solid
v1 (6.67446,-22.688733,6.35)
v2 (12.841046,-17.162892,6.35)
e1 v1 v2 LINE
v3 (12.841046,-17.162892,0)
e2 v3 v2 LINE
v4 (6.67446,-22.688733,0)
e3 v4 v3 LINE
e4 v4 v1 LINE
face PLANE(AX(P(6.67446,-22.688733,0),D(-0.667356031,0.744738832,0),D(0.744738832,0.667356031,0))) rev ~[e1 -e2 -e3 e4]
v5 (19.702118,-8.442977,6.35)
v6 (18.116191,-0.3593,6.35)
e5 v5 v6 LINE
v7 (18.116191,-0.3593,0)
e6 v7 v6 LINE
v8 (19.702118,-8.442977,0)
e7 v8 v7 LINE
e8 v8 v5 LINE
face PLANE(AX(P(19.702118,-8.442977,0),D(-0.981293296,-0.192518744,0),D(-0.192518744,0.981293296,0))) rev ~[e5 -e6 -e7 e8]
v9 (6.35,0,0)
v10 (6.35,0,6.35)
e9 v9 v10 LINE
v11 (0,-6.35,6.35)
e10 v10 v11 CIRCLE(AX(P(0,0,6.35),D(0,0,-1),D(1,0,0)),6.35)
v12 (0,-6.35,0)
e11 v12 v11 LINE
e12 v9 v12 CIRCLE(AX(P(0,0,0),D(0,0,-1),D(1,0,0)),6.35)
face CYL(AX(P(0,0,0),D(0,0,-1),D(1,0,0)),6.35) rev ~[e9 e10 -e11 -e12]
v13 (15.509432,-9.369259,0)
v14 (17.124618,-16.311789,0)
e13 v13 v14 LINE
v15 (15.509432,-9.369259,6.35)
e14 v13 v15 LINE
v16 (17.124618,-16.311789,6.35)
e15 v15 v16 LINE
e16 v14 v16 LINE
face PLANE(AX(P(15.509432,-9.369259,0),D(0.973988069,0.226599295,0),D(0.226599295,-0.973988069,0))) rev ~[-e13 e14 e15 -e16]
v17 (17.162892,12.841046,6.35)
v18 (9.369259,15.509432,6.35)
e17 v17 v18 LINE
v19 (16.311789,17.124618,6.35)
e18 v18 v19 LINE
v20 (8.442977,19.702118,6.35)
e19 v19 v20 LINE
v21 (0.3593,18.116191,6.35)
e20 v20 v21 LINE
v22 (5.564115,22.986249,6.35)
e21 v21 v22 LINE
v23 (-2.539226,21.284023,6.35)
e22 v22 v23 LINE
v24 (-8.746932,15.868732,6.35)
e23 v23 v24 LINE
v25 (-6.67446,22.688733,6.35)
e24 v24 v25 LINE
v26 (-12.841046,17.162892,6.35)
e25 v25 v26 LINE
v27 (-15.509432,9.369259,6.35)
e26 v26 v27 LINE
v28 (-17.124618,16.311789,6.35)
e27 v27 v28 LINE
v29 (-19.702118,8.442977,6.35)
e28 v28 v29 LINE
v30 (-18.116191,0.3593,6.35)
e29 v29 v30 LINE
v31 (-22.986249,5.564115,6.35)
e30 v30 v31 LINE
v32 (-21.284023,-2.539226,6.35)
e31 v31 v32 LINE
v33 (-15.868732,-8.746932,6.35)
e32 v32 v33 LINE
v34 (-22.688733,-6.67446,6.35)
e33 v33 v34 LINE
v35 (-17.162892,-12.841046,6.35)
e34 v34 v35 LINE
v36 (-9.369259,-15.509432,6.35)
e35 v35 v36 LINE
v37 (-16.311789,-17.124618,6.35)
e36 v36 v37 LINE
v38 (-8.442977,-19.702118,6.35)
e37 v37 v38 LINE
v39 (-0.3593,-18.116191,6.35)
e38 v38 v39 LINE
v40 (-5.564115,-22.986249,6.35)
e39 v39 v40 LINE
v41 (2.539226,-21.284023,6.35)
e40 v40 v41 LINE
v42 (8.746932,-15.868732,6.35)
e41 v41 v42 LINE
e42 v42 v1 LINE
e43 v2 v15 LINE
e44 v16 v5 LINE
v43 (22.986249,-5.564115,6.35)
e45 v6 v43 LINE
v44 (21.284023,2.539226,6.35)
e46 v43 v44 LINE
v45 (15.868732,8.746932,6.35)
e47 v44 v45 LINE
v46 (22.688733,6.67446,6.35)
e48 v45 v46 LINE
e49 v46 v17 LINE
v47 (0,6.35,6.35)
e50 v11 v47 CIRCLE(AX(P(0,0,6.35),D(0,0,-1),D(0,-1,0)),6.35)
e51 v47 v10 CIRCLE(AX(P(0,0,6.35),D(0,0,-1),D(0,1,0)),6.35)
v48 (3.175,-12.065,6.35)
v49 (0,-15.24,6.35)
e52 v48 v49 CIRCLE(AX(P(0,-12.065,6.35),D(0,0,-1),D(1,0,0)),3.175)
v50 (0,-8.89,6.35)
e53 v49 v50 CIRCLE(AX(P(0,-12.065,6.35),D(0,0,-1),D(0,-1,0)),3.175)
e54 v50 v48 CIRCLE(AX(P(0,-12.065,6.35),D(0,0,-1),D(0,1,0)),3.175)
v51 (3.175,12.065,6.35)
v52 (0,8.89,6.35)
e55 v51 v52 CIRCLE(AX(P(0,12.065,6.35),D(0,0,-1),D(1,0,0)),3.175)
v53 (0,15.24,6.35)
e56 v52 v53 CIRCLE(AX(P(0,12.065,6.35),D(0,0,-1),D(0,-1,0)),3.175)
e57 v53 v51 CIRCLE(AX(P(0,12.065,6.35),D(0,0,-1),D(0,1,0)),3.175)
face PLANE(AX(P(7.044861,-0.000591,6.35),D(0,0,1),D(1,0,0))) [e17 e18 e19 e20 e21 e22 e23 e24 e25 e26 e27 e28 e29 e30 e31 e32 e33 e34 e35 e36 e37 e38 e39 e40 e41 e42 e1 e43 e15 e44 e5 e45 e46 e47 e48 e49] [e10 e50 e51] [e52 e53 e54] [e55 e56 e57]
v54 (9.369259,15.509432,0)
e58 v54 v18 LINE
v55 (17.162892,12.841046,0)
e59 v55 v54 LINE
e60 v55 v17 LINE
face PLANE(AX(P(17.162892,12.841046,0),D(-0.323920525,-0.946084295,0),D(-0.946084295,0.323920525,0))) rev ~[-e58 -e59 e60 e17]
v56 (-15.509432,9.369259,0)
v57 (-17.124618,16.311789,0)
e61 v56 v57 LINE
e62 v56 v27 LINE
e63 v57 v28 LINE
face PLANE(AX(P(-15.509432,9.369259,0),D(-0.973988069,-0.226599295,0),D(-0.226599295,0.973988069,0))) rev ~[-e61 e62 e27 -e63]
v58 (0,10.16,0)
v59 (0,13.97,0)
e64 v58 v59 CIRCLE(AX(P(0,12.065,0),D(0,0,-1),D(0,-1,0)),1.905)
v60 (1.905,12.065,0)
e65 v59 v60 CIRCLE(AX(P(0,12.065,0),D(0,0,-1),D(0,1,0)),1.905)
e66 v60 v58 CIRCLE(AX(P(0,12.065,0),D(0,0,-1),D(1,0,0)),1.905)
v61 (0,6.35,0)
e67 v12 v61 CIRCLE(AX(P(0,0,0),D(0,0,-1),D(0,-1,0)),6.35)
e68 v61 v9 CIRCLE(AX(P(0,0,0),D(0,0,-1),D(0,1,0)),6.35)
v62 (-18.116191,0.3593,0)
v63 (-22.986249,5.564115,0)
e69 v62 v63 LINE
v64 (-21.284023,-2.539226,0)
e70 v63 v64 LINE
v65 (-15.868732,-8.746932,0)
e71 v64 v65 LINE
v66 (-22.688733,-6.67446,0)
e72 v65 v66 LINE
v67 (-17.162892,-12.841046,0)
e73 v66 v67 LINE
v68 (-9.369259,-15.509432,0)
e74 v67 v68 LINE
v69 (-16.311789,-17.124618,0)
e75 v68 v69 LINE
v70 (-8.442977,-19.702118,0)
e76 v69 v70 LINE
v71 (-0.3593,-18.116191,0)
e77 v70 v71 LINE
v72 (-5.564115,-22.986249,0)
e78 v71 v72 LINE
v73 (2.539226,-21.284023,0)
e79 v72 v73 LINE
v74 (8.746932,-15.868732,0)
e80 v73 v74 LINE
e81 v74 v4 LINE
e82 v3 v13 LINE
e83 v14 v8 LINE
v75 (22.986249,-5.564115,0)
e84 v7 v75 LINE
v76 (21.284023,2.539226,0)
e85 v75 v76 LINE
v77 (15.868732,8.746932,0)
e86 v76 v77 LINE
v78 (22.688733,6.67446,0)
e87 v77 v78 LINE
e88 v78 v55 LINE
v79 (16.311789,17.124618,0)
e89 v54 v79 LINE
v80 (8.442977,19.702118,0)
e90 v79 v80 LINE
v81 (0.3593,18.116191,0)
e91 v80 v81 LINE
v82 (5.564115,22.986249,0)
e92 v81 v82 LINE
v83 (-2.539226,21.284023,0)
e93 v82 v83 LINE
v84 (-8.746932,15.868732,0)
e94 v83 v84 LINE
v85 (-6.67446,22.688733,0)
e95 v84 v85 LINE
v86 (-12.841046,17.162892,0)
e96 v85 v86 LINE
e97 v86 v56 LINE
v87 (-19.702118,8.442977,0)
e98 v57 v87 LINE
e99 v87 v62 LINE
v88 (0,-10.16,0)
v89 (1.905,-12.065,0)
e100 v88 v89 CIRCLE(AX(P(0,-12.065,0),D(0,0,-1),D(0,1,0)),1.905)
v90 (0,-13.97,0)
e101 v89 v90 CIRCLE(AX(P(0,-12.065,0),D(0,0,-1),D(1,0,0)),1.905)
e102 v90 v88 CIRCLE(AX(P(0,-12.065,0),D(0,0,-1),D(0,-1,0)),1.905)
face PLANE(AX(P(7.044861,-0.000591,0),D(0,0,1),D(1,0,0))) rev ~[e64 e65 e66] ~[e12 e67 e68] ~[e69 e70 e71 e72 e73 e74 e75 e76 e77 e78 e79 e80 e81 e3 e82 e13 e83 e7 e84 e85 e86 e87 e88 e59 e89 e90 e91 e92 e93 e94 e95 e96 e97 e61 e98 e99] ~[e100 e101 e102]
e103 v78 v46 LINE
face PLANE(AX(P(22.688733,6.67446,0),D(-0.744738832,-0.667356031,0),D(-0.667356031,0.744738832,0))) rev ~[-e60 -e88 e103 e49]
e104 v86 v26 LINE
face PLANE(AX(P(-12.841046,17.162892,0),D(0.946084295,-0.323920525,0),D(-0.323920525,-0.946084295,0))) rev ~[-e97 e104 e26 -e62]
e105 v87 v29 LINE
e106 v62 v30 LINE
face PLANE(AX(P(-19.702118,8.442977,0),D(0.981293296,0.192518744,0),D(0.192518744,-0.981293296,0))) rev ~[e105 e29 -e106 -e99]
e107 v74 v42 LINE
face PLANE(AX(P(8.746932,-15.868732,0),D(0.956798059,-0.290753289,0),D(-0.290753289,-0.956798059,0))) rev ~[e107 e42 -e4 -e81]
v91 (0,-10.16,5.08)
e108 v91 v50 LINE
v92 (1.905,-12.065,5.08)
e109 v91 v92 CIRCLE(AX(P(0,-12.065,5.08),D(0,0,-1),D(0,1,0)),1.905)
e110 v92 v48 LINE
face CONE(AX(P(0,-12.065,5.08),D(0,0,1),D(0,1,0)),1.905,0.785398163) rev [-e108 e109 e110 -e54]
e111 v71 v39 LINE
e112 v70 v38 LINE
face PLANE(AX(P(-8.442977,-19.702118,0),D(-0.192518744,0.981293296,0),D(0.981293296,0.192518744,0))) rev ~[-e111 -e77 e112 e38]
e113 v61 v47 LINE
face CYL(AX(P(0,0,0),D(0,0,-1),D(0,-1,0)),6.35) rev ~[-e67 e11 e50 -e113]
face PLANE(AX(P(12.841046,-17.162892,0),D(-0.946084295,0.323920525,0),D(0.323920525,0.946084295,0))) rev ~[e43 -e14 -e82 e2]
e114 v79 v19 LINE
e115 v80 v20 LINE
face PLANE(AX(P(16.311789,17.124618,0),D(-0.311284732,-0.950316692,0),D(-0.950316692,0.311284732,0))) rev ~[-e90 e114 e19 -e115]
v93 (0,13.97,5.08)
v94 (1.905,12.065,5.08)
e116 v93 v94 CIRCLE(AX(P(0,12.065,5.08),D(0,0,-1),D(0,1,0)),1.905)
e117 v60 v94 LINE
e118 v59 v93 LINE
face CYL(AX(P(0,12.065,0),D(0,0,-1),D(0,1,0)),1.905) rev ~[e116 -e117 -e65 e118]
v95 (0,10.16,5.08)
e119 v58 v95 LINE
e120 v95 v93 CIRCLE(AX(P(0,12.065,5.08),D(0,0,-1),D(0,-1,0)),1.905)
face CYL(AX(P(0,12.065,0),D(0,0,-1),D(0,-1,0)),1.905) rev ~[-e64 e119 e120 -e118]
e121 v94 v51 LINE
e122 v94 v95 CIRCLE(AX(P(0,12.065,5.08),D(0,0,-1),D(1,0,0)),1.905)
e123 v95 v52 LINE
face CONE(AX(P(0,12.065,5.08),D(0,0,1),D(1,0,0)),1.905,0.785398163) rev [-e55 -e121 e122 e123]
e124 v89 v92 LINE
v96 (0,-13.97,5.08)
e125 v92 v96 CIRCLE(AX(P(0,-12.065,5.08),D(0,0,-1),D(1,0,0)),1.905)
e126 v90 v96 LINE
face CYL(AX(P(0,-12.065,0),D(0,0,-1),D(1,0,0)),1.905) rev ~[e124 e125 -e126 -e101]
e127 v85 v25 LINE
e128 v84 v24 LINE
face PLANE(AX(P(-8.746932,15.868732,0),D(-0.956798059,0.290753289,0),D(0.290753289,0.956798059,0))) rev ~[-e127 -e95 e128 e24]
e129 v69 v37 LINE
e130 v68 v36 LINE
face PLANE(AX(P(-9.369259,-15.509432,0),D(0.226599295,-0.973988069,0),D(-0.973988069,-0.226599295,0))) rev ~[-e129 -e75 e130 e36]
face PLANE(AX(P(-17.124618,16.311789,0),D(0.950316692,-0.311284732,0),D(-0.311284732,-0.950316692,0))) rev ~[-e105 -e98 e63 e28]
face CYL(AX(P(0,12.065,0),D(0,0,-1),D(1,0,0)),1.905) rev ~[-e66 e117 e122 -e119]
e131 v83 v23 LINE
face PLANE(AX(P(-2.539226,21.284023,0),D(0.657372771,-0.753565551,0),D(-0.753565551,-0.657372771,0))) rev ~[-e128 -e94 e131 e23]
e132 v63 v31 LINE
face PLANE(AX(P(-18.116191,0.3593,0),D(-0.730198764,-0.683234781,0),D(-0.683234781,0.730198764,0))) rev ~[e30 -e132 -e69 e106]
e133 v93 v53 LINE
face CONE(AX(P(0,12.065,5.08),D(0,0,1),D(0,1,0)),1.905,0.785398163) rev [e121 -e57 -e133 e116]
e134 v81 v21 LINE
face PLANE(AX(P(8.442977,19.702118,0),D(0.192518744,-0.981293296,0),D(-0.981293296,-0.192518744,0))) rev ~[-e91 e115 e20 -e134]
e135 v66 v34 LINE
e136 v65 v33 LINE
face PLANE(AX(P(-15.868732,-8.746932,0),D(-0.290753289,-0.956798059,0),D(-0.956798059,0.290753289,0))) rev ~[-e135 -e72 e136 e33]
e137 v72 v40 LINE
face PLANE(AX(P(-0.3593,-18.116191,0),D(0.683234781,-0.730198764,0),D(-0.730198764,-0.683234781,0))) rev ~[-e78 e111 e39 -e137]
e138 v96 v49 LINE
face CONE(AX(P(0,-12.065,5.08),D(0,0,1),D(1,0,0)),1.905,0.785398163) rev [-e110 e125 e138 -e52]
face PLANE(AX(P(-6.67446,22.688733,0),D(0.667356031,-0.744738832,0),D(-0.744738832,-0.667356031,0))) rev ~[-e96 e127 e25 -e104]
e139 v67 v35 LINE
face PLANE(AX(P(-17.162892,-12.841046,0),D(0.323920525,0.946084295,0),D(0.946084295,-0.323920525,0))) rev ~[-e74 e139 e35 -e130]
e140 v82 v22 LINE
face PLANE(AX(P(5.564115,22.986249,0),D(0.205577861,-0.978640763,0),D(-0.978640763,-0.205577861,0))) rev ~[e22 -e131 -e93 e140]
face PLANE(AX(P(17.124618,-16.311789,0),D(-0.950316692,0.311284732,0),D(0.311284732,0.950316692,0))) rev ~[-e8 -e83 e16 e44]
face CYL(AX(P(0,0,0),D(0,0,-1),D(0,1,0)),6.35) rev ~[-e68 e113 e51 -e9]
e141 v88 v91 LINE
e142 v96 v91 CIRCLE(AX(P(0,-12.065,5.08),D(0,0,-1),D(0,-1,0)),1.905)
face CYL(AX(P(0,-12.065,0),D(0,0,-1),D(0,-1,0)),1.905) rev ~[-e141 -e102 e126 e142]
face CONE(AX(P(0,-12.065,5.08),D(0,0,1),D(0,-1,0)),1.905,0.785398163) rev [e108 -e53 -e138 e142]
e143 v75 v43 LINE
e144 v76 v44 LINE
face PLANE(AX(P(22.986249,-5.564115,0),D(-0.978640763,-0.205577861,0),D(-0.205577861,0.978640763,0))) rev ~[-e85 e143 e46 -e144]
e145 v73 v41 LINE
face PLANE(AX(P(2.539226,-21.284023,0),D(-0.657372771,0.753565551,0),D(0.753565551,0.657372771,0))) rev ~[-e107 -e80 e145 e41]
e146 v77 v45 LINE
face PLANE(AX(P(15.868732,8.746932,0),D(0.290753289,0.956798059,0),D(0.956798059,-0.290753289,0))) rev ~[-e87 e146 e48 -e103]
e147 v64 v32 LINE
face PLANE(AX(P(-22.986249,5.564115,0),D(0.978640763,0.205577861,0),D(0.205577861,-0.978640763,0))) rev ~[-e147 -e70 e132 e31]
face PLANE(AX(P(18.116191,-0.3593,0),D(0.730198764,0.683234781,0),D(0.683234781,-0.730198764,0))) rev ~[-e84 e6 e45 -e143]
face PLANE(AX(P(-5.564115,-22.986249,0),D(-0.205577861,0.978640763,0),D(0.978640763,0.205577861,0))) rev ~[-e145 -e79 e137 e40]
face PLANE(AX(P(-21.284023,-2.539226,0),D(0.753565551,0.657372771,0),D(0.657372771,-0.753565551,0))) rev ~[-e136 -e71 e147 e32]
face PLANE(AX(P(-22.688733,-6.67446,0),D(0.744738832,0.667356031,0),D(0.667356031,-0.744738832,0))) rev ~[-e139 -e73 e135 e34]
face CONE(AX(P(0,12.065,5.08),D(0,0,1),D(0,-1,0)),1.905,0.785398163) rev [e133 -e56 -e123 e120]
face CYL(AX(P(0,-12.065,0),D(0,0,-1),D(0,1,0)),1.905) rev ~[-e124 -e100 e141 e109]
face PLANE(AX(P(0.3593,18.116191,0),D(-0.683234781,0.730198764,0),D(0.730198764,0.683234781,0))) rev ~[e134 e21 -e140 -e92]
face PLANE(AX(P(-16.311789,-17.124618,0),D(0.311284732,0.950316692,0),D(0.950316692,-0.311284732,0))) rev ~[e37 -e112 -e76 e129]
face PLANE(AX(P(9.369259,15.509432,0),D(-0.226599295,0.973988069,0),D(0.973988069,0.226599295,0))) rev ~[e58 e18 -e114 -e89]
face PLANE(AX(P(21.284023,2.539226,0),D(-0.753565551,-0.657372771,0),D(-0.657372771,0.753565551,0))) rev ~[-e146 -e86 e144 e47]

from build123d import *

# Parameters (mm, degrees)
F1_DEPTH = 6.35
F2_SIZE  = 1.27


# Not quite as in the source:
# - a feature names something its author has since deleted; it is built from what else it names


with BuildPart() as f1:
    # F0 (on Top) → F1 (new body)
    with BuildSketch(Plane.XY):
        with BuildLine():
            ThreePointArc((16.2360474276, -7.2470106892), (17.3897286244, -3.7048263615), (17.78, 0))
            ThreePointArc((17.78, 0), (17.7560676116, 0.9222054927), (17.6843348739, 1.8419283555))
            ThreePointArc((17.6843348739, 1.8419283555), (16.9123599344, 5.4863905666), (15.3979316793, 8.89))
            ThreePointArc((15.3979316793, 8.89), (14.9161028766, 9.67668719), (14.3941190721, 10.4373241848))
            ThreePointArc((14.3941190721, 10.4373241848), (11.9033380579, 13.2075335729), (8.89, 15.3979316793))
            ThreePointArc((8.89, 15.3979316793), (8.0793804216, 15.8383083694), (7.2470106892, 16.2360474276))
            ThreePointArc((7.2470106892, 16.2360474276), (3.7048263615, 17.3897286244), (0, 17.78))
            Line((0, 17.78), (0, 13.97))
            ThreePointArc((0, 13.97), (1.3470384182, 13.4120384182), (1.905, 12.065))
            ThreePointArc((1.905, 12.065), (1.3470384182, 10.7179615818), (0, 10.16))
            Line((0, 10.16), (0, 6.35))
            ThreePointArc((0, 6.35), (4.4901280605, 4.4901280605), (6.35, 0))
            ThreePointArc((6.35, 0), (4.4901280605, -4.4901280605), (0, -6.35))
            Line((0, -6.35), (0, -10.16))
            ThreePointArc((0, -10.16), (1.3470384182, -10.7179615818), (1.905, -12.065))
            ThreePointArc((1.905, -12.065), (1.3470384182, -13.4120384182), (0, -13.97))
            Line((0, -13.97), (0, -17.78))
            ThreePointArc((0, -17.78), (0.9222054927, -17.7560676116), (1.8419283555, -17.6843348739))
            ThreePointArc((1.8419283555, -17.6843348739), (5.4863905666, -16.9123599344), (8.89, -15.3979316793))
            ThreePointArc((8.89, -15.3979316793), (9.67668719, -14.9161028766), (10.4373241848, -14.3941190721))
            ThreePointArc((10.4373241848, -14.3941190721), (13.2075335729, -11.9033380579), (15.3979316793, -8.89))
            ThreePointArc((15.3979316793, -8.89), (15.8383083694, -8.0793804216), (16.2360474276, -7.2470106892))
        make_face()
        with BuildLine():
            Line((18.1161912512, -0.3593002622), (17.78, 0))
            ThreePointArc((17.78, 0), (17.3897286244, -3.7048263615), (16.2360474276, -7.2470106892))
            Line((16.2360474276, -7.2470106892), (15.5094317122, -9.3692587802))
            Line((15.5094317122, -9.3692587802), (17.1246183088, -16.3117890891))
            Line((17.1246183088, -16.3117890891), (19.7021180322, -8.4429771511))
            Line((19.7021180322, -8.4429771511), (18.1161912512, -0.3593002622))
        make_face()
        with BuildLine():
            ThreePointArc((17.6843348739, 1.8419283555), (17.7560676116, 0.9222054927), (17.78, 0))
            Line((17.78, 0), (18.1161912512, -0.3593002622))
            Line((18.1161912512, -0.3593002622), (17.6843348739, 1.8419283555))
        make_face()
        with BuildLine():
            ThreePointArc((15.3979316793, 8.89), (16.9123599344, 5.4863905666), (17.6843348739, 1.8419283555))
            Line((17.6843348739, 1.8419283555), (18.1161912512, -0.3593002622))
            Line((18.1161912512, -0.3593002622), (22.9862490301, -5.564114578))
            Line((22.9862490301, -5.564114578), (21.2840232998, 2.5392263196))
            Line((21.2840232998, 2.5392263196), (15.8687319744, 8.7469324709))
            Line((15.8687319744, 8.7469324709), (15.3979316793, 8.89))
        make_face()
        with BuildLine():
            Line((15.5094317122, -9.3692587802), (16.2360474276, -7.2470106892))
            ThreePointArc((16.2360474276, -7.2470106892), (15.8383083694, -8.0793804216), (15.3979316793, -8.89))
            Line((15.3979316793, -8.89), (15.5094317122, -9.3692587802))
        make_face()
        with BuildLine():
            ThreePointArc((14.3941190721, 10.4373241848), (14.9161028766, 9.67668719), (15.3979316793, 8.89))
            Line((15.3979316793, 8.89), (15.8687319744, 8.7469324709))
            Line((15.8687319744, 8.7469324709), (14.3941190721, 10.4373241848))
        make_face()
        with BuildLine():
            Line((15.5094317122, -9.3692587802), (15.3979316793, -8.89))
            ThreePointArc((15.3979316793, -8.89), (13.2075335729, -11.9033380579), (10.4373241848, -14.3941190721))
            Line((10.4373241848, -14.3941190721), (8.7469324709, -15.8687319744))
            Line((8.7469324709, -15.8687319744), (6.674459941, -22.6887328868))
            Line((6.674459941, -22.6887328868), (12.8410461487, -17.1628917126))
            Line((12.8410461487, -17.1628917126), (15.5094317122, -9.3692587802))
        make_face()
        with BuildLine():
            ThreePointArc((8.89, 15.3979316793), (11.9033380579, 13.2075335729), (14.3941190721, 10.4373241848))
            Line((14.3941190721, 10.4373241848), (15.8687319744, 8.7469324709))
            Line((15.8687319744, 8.7469324709), (22.6887328868, 6.674459941))
            Line((22.6887328868, 6.674459941), (17.1628917126, 12.8410461487))
            Line((17.1628917126, 12.8410461487), (9.3692587802, 15.5094317122))
            Line((9.3692587802, 15.5094317122), (8.89, 15.3979316793))
        make_face()
        with BuildLine():
            Line((8.7469324709, -15.8687319744), (10.4373241848, -14.3941190721))
            ThreePointArc((10.4373241848, -14.3941190721), (9.67668719, -14.9161028766), (8.89, -15.3979316793))
            Line((8.89, -15.3979316793), (8.7469324709, -15.8687319744))
        make_face()
        with BuildLine():
            ThreePointArc((7.2470106892, 16.2360474276), (8.0793804216, 15.8383083694), (8.89, 15.3979316793))
            Line((8.89, 15.3979316793), (9.3692587802, 15.5094317122))
            Line((9.3692587802, 15.5094317122), (7.2470106892, 16.2360474276))
        make_face()
        with BuildLine():
            Line((8.7469324709, -15.8687319744), (8.89, -15.3979316793))
            ThreePointArc((8.89, -15.3979316793), (5.4863905666, -16.9123599344), (1.8419283555, -17.6843348739))
            Line((1.8419283555, -17.6843348739), (-0.3593002622, -18.1161912512))
            Line((-0.3593002622, -18.1161912512), (-5.564114578, -22.9862490301))
            Line((-5.564114578, -22.9862490301), (2.5392263196, -21.2840232998))
            Line((2.5392263196, -21.2840232998), (8.7469324709, -15.8687319744))
        make_face()
        with BuildLine():
            ThreePointArc((0, 17.78), (3.7048263615, 17.3897286244), (7.2470106892, 16.2360474276))
            Line((7.2470106892, 16.2360474276), (9.3692587802, 15.5094317122))
            Line((9.3692587802, 15.5094317122), (16.3117890891, 17.1246183088))
            Line((16.3117890891, 17.1246183088), (8.4429771511, 19.7021180322))
            Line((8.4429771511, 19.7021180322), (0.3593002622, 18.1161912512))
            Line((0.3593002622, 18.1161912512), (0, 17.78))
        make_face()
        with BuildLine():
            Line((-0.3593002622, -18.1161912512), (1.8419283555, -17.6843348739))
            ThreePointArc((1.8419283555, -17.6843348739), (0.9222054927, -17.7560676116), (0, -17.78))
            Line((0, -17.78), (-0.3593002622, -18.1161912512))
        make_face()
        with BuildLine():
            Line((0, 13.97), (0, 17.78))
            ThreePointArc((0, 17.78), (-0.9222054927, 17.7560676116), (-1.8419283555, 17.6843348739))
            ThreePointArc((-1.8419283555, 17.6843348739), (-5.4863905666, 16.9123599344), (-8.89, 15.3979316793))
            ThreePointArc((-8.89, 15.3979316793), (-9.67668719, 14.9161028766), (-10.4373241848, 14.3941190721))
            ThreePointArc((-10.4373241848, 14.3941190721), (-13.2075335729, 11.9033380579), (-15.3979316793, 8.89))
            ThreePointArc((-15.3979316793, 8.89), (-15.8383083694, 8.0793804216), (-16.2360474276, 7.2470106892))
            ThreePointArc((-16.2360474276, 7.2470106892), (-17.3897286244, 3.7048263615), (-17.78, 0))
            ThreePointArc((-17.78, 0), (-17.7560676116, -0.9222054927), (-17.6843348739, -1.8419283555))
            ThreePointArc((-17.6843348739, -1.8419283555), (-16.9123599344, -5.4863905666), (-15.3979316793, -8.89))
            ThreePointArc((-15.3979316793, -8.89), (-14.9161028766, -9.67668719), (-14.3941190721, -10.4373241848))
            ThreePointArc((-14.3941190721, -10.4373241848), (-11.9033380579, -13.2075335729), (-8.89, -15.3979316793))
            ThreePointArc((-8.89, -15.3979316793), (-8.0793804216, -15.8383083694), (-7.2470106892, -16.2360474276))
            ThreePointArc((-7.2470106892, -16.2360474276), (-3.7048263615, -17.3897286244), (0, -17.78))
            Line((0, -17.78), (0, -13.97))
            ThreePointArc((0, -13.97), (-1.905, -12.065), (0, -10.16))
            Line((0, -10.16), (0, -6.35))
            ThreePointArc((0, -6.35), (-6.35, 0), (0, 6.35))
            Line((0, 6.35), (0, 10.16))
            ThreePointArc((0, 10.16), (-1.905, 12.065), (0, 13.97))
        make_face()
        with BuildLine():
            ThreePointArc((-1.8419283555, 17.6843348739), (-0.9222054927, 17.7560676116), (0, 17.78))
            Line((0, 17.78), (0.3593002622, 18.1161912512))
            Line((0.3593002622, 18.1161912512), (-1.8419283555, 17.6843348739))
        make_face()
        with BuildLine():
            Line((-0.3593002622, -18.1161912512), (0, -17.78))
            ThreePointArc((0, -17.78), (-3.7048263615, -17.3897286244), (-7.2470106892, -16.2360474276))
            Line((-7.2470106892, -16.2360474276), (-9.3692587802, -15.5094317122))
            Line((-9.3692587802, -15.5094317122), (-16.3117890891, -17.1246183088))
            Line((-16.3117890891, -17.1246183088), (-8.4429771511, -19.7021180322))
            Line((-8.4429771511, -19.7021180322), (-0.3593002622, -18.1161912512))
        make_face()
        with BuildLine():
            ThreePointArc((-8.89, 15.3979316793), (-5.4863905666, 16.9123599344), (-1.8419283555, 17.6843348739))
            Line((-1.8419283555, 17.6843348739), (0.3593002622, 18.1161912512))
            Line((0.3593002622, 18.1161912512), (5.564114578, 22.9862490301))
            Line((5.564114578, 22.9862490301), (-2.5392263196, 21.2840232998))
            Line((-2.5392263196, 21.2840232998), (-8.7469324709, 15.8687319744))
            Line((-8.7469324709, 15.8687319744), (-8.89, 15.3979316793))
        make_face()
        with BuildLine():
            Line((-9.3692587802, -15.5094317122), (-7.2470106892, -16.2360474276))
            ThreePointArc((-7.2470106892, -16.2360474276), (-8.0793804216, -15.8383083694), (-8.89, -15.3979316793))
            Line((-8.89, -15.3979316793), (-9.3692587802, -15.5094317122))
        make_face()
        with BuildLine():
            ThreePointArc((-10.4373241848, 14.3941190721), (-9.67668719, 14.9161028766), (-8.89, 15.3979316793))
            Line((-8.89, 15.3979316793), (-8.7469324709, 15.8687319744))
            Line((-8.7469324709, 15.8687319744), (-10.4373241848, 14.3941190721))
        make_face()
        with BuildLine():
            Line((-9.3692587802, -15.5094317122), (-8.89, -15.3979316793))
            ThreePointArc((-8.89, -15.3979316793), (-11.9033380579, -13.2075335729), (-14.3941190721, -10.4373241848))
            Line((-14.3941190721, -10.4373241848), (-15.8687319744, -8.7469324709))
            Line((-15.8687319744, -8.7469324709), (-22.6887328868, -6.674459941))
            Line((-22.6887328868, -6.674459941), (-17.1628917126, -12.8410461487))
            Line((-17.1628917126, -12.8410461487), (-9.3692587802, -15.5094317122))
        make_face()
        with BuildLine():
            ThreePointArc((-15.3979316793, 8.89), (-13.2075335729, 11.9033380579), (-10.4373241848, 14.3941190721))
            Line((-10.4373241848, 14.3941190721), (-8.7469324709, 15.8687319744))
            Line((-8.7469324709, 15.8687319744), (-6.674459941, 22.6887328868))
            Line((-6.674459941, 22.6887328868), (-12.8410461487, 17.1628917126))
            Line((-12.8410461487, 17.1628917126), (-15.5094317122, 9.3692587802))
            Line((-15.5094317122, 9.3692587802), (-15.3979316793, 8.89))
        make_face()
        with BuildLine():
            Line((-15.8687319744, -8.7469324709), (-14.3941190721, -10.4373241848))
            ThreePointArc((-14.3941190721, -10.4373241848), (-14.9161028766, -9.67668719), (-15.3979316793, -8.89))
            Line((-15.3979316793, -8.89), (-15.8687319744, -8.7469324709))
        make_face()
        with BuildLine():
            ThreePointArc((-16.2360474276, 7.2470106892), (-15.8383083694, 8.0793804216), (-15.3979316793, 8.89))
            Line((-15.3979316793, 8.89), (-15.5094317122, 9.3692587802))
            Line((-15.5094317122, 9.3692587802), (-16.2360474276, 7.2470106892))
        make_face()
        with BuildLine():
            Line((-15.8687319744, -8.7469324709), (-15.3979316793, -8.89))
            ThreePointArc((-15.3979316793, -8.89), (-16.9123599344, -5.4863905666), (-17.6843348739, -1.8419283555))
            Line((-17.6843348739, -1.8419283555), (-18.1161912512, 0.3593002622))
            Line((-18.1161912512, 0.3593002622), (-22.9862490301, 5.564114578))
            Line((-22.9862490301, 5.564114578), (-21.2840232998, -2.5392263196))
            Line((-21.2840232998, -2.5392263196), (-15.8687319744, -8.7469324709))
        make_face()
        with BuildLine():
            ThreePointArc((-17.78, 0), (-17.3897286244, 3.7048263615), (-16.2360474276, 7.2470106892))
            Line((-16.2360474276, 7.2470106892), (-15.5094317122, 9.3692587802))
            Line((-15.5094317122, 9.3692587802), (-17.1246183088, 16.3117890891))
            Line((-17.1246183088, 16.3117890891), (-19.7021180322, 8.4429771511))
            Line((-19.7021180322, 8.4429771511), (-18.1161912512, 0.3593002622))
            Line((-18.1161912512, 0.3593002622), (-17.78, 0))
        make_face()
        with BuildLine():
            Line((-18.1161912512, 0.3593002622), (-17.6843348739, -1.8419283555))
            ThreePointArc((-17.6843348739, -1.8419283555), (-17.7560676116, -0.9222054927), (-17.78, 0))
            Line((-17.78, 0), (-18.1161912512, 0.3593002622))
        make_face()
    extrude(amount=F1_DEPTH)

    # F2
    f2_edges = [f1.edges().sort_by_distance(p)[0] for p in [
        (-1.905, 12.065, 6.35),
        (-1.905, -12.065, 6.35),
    ]]
    chamfer(f2_edges, length=F2_SIZE)


solid = f1.part
